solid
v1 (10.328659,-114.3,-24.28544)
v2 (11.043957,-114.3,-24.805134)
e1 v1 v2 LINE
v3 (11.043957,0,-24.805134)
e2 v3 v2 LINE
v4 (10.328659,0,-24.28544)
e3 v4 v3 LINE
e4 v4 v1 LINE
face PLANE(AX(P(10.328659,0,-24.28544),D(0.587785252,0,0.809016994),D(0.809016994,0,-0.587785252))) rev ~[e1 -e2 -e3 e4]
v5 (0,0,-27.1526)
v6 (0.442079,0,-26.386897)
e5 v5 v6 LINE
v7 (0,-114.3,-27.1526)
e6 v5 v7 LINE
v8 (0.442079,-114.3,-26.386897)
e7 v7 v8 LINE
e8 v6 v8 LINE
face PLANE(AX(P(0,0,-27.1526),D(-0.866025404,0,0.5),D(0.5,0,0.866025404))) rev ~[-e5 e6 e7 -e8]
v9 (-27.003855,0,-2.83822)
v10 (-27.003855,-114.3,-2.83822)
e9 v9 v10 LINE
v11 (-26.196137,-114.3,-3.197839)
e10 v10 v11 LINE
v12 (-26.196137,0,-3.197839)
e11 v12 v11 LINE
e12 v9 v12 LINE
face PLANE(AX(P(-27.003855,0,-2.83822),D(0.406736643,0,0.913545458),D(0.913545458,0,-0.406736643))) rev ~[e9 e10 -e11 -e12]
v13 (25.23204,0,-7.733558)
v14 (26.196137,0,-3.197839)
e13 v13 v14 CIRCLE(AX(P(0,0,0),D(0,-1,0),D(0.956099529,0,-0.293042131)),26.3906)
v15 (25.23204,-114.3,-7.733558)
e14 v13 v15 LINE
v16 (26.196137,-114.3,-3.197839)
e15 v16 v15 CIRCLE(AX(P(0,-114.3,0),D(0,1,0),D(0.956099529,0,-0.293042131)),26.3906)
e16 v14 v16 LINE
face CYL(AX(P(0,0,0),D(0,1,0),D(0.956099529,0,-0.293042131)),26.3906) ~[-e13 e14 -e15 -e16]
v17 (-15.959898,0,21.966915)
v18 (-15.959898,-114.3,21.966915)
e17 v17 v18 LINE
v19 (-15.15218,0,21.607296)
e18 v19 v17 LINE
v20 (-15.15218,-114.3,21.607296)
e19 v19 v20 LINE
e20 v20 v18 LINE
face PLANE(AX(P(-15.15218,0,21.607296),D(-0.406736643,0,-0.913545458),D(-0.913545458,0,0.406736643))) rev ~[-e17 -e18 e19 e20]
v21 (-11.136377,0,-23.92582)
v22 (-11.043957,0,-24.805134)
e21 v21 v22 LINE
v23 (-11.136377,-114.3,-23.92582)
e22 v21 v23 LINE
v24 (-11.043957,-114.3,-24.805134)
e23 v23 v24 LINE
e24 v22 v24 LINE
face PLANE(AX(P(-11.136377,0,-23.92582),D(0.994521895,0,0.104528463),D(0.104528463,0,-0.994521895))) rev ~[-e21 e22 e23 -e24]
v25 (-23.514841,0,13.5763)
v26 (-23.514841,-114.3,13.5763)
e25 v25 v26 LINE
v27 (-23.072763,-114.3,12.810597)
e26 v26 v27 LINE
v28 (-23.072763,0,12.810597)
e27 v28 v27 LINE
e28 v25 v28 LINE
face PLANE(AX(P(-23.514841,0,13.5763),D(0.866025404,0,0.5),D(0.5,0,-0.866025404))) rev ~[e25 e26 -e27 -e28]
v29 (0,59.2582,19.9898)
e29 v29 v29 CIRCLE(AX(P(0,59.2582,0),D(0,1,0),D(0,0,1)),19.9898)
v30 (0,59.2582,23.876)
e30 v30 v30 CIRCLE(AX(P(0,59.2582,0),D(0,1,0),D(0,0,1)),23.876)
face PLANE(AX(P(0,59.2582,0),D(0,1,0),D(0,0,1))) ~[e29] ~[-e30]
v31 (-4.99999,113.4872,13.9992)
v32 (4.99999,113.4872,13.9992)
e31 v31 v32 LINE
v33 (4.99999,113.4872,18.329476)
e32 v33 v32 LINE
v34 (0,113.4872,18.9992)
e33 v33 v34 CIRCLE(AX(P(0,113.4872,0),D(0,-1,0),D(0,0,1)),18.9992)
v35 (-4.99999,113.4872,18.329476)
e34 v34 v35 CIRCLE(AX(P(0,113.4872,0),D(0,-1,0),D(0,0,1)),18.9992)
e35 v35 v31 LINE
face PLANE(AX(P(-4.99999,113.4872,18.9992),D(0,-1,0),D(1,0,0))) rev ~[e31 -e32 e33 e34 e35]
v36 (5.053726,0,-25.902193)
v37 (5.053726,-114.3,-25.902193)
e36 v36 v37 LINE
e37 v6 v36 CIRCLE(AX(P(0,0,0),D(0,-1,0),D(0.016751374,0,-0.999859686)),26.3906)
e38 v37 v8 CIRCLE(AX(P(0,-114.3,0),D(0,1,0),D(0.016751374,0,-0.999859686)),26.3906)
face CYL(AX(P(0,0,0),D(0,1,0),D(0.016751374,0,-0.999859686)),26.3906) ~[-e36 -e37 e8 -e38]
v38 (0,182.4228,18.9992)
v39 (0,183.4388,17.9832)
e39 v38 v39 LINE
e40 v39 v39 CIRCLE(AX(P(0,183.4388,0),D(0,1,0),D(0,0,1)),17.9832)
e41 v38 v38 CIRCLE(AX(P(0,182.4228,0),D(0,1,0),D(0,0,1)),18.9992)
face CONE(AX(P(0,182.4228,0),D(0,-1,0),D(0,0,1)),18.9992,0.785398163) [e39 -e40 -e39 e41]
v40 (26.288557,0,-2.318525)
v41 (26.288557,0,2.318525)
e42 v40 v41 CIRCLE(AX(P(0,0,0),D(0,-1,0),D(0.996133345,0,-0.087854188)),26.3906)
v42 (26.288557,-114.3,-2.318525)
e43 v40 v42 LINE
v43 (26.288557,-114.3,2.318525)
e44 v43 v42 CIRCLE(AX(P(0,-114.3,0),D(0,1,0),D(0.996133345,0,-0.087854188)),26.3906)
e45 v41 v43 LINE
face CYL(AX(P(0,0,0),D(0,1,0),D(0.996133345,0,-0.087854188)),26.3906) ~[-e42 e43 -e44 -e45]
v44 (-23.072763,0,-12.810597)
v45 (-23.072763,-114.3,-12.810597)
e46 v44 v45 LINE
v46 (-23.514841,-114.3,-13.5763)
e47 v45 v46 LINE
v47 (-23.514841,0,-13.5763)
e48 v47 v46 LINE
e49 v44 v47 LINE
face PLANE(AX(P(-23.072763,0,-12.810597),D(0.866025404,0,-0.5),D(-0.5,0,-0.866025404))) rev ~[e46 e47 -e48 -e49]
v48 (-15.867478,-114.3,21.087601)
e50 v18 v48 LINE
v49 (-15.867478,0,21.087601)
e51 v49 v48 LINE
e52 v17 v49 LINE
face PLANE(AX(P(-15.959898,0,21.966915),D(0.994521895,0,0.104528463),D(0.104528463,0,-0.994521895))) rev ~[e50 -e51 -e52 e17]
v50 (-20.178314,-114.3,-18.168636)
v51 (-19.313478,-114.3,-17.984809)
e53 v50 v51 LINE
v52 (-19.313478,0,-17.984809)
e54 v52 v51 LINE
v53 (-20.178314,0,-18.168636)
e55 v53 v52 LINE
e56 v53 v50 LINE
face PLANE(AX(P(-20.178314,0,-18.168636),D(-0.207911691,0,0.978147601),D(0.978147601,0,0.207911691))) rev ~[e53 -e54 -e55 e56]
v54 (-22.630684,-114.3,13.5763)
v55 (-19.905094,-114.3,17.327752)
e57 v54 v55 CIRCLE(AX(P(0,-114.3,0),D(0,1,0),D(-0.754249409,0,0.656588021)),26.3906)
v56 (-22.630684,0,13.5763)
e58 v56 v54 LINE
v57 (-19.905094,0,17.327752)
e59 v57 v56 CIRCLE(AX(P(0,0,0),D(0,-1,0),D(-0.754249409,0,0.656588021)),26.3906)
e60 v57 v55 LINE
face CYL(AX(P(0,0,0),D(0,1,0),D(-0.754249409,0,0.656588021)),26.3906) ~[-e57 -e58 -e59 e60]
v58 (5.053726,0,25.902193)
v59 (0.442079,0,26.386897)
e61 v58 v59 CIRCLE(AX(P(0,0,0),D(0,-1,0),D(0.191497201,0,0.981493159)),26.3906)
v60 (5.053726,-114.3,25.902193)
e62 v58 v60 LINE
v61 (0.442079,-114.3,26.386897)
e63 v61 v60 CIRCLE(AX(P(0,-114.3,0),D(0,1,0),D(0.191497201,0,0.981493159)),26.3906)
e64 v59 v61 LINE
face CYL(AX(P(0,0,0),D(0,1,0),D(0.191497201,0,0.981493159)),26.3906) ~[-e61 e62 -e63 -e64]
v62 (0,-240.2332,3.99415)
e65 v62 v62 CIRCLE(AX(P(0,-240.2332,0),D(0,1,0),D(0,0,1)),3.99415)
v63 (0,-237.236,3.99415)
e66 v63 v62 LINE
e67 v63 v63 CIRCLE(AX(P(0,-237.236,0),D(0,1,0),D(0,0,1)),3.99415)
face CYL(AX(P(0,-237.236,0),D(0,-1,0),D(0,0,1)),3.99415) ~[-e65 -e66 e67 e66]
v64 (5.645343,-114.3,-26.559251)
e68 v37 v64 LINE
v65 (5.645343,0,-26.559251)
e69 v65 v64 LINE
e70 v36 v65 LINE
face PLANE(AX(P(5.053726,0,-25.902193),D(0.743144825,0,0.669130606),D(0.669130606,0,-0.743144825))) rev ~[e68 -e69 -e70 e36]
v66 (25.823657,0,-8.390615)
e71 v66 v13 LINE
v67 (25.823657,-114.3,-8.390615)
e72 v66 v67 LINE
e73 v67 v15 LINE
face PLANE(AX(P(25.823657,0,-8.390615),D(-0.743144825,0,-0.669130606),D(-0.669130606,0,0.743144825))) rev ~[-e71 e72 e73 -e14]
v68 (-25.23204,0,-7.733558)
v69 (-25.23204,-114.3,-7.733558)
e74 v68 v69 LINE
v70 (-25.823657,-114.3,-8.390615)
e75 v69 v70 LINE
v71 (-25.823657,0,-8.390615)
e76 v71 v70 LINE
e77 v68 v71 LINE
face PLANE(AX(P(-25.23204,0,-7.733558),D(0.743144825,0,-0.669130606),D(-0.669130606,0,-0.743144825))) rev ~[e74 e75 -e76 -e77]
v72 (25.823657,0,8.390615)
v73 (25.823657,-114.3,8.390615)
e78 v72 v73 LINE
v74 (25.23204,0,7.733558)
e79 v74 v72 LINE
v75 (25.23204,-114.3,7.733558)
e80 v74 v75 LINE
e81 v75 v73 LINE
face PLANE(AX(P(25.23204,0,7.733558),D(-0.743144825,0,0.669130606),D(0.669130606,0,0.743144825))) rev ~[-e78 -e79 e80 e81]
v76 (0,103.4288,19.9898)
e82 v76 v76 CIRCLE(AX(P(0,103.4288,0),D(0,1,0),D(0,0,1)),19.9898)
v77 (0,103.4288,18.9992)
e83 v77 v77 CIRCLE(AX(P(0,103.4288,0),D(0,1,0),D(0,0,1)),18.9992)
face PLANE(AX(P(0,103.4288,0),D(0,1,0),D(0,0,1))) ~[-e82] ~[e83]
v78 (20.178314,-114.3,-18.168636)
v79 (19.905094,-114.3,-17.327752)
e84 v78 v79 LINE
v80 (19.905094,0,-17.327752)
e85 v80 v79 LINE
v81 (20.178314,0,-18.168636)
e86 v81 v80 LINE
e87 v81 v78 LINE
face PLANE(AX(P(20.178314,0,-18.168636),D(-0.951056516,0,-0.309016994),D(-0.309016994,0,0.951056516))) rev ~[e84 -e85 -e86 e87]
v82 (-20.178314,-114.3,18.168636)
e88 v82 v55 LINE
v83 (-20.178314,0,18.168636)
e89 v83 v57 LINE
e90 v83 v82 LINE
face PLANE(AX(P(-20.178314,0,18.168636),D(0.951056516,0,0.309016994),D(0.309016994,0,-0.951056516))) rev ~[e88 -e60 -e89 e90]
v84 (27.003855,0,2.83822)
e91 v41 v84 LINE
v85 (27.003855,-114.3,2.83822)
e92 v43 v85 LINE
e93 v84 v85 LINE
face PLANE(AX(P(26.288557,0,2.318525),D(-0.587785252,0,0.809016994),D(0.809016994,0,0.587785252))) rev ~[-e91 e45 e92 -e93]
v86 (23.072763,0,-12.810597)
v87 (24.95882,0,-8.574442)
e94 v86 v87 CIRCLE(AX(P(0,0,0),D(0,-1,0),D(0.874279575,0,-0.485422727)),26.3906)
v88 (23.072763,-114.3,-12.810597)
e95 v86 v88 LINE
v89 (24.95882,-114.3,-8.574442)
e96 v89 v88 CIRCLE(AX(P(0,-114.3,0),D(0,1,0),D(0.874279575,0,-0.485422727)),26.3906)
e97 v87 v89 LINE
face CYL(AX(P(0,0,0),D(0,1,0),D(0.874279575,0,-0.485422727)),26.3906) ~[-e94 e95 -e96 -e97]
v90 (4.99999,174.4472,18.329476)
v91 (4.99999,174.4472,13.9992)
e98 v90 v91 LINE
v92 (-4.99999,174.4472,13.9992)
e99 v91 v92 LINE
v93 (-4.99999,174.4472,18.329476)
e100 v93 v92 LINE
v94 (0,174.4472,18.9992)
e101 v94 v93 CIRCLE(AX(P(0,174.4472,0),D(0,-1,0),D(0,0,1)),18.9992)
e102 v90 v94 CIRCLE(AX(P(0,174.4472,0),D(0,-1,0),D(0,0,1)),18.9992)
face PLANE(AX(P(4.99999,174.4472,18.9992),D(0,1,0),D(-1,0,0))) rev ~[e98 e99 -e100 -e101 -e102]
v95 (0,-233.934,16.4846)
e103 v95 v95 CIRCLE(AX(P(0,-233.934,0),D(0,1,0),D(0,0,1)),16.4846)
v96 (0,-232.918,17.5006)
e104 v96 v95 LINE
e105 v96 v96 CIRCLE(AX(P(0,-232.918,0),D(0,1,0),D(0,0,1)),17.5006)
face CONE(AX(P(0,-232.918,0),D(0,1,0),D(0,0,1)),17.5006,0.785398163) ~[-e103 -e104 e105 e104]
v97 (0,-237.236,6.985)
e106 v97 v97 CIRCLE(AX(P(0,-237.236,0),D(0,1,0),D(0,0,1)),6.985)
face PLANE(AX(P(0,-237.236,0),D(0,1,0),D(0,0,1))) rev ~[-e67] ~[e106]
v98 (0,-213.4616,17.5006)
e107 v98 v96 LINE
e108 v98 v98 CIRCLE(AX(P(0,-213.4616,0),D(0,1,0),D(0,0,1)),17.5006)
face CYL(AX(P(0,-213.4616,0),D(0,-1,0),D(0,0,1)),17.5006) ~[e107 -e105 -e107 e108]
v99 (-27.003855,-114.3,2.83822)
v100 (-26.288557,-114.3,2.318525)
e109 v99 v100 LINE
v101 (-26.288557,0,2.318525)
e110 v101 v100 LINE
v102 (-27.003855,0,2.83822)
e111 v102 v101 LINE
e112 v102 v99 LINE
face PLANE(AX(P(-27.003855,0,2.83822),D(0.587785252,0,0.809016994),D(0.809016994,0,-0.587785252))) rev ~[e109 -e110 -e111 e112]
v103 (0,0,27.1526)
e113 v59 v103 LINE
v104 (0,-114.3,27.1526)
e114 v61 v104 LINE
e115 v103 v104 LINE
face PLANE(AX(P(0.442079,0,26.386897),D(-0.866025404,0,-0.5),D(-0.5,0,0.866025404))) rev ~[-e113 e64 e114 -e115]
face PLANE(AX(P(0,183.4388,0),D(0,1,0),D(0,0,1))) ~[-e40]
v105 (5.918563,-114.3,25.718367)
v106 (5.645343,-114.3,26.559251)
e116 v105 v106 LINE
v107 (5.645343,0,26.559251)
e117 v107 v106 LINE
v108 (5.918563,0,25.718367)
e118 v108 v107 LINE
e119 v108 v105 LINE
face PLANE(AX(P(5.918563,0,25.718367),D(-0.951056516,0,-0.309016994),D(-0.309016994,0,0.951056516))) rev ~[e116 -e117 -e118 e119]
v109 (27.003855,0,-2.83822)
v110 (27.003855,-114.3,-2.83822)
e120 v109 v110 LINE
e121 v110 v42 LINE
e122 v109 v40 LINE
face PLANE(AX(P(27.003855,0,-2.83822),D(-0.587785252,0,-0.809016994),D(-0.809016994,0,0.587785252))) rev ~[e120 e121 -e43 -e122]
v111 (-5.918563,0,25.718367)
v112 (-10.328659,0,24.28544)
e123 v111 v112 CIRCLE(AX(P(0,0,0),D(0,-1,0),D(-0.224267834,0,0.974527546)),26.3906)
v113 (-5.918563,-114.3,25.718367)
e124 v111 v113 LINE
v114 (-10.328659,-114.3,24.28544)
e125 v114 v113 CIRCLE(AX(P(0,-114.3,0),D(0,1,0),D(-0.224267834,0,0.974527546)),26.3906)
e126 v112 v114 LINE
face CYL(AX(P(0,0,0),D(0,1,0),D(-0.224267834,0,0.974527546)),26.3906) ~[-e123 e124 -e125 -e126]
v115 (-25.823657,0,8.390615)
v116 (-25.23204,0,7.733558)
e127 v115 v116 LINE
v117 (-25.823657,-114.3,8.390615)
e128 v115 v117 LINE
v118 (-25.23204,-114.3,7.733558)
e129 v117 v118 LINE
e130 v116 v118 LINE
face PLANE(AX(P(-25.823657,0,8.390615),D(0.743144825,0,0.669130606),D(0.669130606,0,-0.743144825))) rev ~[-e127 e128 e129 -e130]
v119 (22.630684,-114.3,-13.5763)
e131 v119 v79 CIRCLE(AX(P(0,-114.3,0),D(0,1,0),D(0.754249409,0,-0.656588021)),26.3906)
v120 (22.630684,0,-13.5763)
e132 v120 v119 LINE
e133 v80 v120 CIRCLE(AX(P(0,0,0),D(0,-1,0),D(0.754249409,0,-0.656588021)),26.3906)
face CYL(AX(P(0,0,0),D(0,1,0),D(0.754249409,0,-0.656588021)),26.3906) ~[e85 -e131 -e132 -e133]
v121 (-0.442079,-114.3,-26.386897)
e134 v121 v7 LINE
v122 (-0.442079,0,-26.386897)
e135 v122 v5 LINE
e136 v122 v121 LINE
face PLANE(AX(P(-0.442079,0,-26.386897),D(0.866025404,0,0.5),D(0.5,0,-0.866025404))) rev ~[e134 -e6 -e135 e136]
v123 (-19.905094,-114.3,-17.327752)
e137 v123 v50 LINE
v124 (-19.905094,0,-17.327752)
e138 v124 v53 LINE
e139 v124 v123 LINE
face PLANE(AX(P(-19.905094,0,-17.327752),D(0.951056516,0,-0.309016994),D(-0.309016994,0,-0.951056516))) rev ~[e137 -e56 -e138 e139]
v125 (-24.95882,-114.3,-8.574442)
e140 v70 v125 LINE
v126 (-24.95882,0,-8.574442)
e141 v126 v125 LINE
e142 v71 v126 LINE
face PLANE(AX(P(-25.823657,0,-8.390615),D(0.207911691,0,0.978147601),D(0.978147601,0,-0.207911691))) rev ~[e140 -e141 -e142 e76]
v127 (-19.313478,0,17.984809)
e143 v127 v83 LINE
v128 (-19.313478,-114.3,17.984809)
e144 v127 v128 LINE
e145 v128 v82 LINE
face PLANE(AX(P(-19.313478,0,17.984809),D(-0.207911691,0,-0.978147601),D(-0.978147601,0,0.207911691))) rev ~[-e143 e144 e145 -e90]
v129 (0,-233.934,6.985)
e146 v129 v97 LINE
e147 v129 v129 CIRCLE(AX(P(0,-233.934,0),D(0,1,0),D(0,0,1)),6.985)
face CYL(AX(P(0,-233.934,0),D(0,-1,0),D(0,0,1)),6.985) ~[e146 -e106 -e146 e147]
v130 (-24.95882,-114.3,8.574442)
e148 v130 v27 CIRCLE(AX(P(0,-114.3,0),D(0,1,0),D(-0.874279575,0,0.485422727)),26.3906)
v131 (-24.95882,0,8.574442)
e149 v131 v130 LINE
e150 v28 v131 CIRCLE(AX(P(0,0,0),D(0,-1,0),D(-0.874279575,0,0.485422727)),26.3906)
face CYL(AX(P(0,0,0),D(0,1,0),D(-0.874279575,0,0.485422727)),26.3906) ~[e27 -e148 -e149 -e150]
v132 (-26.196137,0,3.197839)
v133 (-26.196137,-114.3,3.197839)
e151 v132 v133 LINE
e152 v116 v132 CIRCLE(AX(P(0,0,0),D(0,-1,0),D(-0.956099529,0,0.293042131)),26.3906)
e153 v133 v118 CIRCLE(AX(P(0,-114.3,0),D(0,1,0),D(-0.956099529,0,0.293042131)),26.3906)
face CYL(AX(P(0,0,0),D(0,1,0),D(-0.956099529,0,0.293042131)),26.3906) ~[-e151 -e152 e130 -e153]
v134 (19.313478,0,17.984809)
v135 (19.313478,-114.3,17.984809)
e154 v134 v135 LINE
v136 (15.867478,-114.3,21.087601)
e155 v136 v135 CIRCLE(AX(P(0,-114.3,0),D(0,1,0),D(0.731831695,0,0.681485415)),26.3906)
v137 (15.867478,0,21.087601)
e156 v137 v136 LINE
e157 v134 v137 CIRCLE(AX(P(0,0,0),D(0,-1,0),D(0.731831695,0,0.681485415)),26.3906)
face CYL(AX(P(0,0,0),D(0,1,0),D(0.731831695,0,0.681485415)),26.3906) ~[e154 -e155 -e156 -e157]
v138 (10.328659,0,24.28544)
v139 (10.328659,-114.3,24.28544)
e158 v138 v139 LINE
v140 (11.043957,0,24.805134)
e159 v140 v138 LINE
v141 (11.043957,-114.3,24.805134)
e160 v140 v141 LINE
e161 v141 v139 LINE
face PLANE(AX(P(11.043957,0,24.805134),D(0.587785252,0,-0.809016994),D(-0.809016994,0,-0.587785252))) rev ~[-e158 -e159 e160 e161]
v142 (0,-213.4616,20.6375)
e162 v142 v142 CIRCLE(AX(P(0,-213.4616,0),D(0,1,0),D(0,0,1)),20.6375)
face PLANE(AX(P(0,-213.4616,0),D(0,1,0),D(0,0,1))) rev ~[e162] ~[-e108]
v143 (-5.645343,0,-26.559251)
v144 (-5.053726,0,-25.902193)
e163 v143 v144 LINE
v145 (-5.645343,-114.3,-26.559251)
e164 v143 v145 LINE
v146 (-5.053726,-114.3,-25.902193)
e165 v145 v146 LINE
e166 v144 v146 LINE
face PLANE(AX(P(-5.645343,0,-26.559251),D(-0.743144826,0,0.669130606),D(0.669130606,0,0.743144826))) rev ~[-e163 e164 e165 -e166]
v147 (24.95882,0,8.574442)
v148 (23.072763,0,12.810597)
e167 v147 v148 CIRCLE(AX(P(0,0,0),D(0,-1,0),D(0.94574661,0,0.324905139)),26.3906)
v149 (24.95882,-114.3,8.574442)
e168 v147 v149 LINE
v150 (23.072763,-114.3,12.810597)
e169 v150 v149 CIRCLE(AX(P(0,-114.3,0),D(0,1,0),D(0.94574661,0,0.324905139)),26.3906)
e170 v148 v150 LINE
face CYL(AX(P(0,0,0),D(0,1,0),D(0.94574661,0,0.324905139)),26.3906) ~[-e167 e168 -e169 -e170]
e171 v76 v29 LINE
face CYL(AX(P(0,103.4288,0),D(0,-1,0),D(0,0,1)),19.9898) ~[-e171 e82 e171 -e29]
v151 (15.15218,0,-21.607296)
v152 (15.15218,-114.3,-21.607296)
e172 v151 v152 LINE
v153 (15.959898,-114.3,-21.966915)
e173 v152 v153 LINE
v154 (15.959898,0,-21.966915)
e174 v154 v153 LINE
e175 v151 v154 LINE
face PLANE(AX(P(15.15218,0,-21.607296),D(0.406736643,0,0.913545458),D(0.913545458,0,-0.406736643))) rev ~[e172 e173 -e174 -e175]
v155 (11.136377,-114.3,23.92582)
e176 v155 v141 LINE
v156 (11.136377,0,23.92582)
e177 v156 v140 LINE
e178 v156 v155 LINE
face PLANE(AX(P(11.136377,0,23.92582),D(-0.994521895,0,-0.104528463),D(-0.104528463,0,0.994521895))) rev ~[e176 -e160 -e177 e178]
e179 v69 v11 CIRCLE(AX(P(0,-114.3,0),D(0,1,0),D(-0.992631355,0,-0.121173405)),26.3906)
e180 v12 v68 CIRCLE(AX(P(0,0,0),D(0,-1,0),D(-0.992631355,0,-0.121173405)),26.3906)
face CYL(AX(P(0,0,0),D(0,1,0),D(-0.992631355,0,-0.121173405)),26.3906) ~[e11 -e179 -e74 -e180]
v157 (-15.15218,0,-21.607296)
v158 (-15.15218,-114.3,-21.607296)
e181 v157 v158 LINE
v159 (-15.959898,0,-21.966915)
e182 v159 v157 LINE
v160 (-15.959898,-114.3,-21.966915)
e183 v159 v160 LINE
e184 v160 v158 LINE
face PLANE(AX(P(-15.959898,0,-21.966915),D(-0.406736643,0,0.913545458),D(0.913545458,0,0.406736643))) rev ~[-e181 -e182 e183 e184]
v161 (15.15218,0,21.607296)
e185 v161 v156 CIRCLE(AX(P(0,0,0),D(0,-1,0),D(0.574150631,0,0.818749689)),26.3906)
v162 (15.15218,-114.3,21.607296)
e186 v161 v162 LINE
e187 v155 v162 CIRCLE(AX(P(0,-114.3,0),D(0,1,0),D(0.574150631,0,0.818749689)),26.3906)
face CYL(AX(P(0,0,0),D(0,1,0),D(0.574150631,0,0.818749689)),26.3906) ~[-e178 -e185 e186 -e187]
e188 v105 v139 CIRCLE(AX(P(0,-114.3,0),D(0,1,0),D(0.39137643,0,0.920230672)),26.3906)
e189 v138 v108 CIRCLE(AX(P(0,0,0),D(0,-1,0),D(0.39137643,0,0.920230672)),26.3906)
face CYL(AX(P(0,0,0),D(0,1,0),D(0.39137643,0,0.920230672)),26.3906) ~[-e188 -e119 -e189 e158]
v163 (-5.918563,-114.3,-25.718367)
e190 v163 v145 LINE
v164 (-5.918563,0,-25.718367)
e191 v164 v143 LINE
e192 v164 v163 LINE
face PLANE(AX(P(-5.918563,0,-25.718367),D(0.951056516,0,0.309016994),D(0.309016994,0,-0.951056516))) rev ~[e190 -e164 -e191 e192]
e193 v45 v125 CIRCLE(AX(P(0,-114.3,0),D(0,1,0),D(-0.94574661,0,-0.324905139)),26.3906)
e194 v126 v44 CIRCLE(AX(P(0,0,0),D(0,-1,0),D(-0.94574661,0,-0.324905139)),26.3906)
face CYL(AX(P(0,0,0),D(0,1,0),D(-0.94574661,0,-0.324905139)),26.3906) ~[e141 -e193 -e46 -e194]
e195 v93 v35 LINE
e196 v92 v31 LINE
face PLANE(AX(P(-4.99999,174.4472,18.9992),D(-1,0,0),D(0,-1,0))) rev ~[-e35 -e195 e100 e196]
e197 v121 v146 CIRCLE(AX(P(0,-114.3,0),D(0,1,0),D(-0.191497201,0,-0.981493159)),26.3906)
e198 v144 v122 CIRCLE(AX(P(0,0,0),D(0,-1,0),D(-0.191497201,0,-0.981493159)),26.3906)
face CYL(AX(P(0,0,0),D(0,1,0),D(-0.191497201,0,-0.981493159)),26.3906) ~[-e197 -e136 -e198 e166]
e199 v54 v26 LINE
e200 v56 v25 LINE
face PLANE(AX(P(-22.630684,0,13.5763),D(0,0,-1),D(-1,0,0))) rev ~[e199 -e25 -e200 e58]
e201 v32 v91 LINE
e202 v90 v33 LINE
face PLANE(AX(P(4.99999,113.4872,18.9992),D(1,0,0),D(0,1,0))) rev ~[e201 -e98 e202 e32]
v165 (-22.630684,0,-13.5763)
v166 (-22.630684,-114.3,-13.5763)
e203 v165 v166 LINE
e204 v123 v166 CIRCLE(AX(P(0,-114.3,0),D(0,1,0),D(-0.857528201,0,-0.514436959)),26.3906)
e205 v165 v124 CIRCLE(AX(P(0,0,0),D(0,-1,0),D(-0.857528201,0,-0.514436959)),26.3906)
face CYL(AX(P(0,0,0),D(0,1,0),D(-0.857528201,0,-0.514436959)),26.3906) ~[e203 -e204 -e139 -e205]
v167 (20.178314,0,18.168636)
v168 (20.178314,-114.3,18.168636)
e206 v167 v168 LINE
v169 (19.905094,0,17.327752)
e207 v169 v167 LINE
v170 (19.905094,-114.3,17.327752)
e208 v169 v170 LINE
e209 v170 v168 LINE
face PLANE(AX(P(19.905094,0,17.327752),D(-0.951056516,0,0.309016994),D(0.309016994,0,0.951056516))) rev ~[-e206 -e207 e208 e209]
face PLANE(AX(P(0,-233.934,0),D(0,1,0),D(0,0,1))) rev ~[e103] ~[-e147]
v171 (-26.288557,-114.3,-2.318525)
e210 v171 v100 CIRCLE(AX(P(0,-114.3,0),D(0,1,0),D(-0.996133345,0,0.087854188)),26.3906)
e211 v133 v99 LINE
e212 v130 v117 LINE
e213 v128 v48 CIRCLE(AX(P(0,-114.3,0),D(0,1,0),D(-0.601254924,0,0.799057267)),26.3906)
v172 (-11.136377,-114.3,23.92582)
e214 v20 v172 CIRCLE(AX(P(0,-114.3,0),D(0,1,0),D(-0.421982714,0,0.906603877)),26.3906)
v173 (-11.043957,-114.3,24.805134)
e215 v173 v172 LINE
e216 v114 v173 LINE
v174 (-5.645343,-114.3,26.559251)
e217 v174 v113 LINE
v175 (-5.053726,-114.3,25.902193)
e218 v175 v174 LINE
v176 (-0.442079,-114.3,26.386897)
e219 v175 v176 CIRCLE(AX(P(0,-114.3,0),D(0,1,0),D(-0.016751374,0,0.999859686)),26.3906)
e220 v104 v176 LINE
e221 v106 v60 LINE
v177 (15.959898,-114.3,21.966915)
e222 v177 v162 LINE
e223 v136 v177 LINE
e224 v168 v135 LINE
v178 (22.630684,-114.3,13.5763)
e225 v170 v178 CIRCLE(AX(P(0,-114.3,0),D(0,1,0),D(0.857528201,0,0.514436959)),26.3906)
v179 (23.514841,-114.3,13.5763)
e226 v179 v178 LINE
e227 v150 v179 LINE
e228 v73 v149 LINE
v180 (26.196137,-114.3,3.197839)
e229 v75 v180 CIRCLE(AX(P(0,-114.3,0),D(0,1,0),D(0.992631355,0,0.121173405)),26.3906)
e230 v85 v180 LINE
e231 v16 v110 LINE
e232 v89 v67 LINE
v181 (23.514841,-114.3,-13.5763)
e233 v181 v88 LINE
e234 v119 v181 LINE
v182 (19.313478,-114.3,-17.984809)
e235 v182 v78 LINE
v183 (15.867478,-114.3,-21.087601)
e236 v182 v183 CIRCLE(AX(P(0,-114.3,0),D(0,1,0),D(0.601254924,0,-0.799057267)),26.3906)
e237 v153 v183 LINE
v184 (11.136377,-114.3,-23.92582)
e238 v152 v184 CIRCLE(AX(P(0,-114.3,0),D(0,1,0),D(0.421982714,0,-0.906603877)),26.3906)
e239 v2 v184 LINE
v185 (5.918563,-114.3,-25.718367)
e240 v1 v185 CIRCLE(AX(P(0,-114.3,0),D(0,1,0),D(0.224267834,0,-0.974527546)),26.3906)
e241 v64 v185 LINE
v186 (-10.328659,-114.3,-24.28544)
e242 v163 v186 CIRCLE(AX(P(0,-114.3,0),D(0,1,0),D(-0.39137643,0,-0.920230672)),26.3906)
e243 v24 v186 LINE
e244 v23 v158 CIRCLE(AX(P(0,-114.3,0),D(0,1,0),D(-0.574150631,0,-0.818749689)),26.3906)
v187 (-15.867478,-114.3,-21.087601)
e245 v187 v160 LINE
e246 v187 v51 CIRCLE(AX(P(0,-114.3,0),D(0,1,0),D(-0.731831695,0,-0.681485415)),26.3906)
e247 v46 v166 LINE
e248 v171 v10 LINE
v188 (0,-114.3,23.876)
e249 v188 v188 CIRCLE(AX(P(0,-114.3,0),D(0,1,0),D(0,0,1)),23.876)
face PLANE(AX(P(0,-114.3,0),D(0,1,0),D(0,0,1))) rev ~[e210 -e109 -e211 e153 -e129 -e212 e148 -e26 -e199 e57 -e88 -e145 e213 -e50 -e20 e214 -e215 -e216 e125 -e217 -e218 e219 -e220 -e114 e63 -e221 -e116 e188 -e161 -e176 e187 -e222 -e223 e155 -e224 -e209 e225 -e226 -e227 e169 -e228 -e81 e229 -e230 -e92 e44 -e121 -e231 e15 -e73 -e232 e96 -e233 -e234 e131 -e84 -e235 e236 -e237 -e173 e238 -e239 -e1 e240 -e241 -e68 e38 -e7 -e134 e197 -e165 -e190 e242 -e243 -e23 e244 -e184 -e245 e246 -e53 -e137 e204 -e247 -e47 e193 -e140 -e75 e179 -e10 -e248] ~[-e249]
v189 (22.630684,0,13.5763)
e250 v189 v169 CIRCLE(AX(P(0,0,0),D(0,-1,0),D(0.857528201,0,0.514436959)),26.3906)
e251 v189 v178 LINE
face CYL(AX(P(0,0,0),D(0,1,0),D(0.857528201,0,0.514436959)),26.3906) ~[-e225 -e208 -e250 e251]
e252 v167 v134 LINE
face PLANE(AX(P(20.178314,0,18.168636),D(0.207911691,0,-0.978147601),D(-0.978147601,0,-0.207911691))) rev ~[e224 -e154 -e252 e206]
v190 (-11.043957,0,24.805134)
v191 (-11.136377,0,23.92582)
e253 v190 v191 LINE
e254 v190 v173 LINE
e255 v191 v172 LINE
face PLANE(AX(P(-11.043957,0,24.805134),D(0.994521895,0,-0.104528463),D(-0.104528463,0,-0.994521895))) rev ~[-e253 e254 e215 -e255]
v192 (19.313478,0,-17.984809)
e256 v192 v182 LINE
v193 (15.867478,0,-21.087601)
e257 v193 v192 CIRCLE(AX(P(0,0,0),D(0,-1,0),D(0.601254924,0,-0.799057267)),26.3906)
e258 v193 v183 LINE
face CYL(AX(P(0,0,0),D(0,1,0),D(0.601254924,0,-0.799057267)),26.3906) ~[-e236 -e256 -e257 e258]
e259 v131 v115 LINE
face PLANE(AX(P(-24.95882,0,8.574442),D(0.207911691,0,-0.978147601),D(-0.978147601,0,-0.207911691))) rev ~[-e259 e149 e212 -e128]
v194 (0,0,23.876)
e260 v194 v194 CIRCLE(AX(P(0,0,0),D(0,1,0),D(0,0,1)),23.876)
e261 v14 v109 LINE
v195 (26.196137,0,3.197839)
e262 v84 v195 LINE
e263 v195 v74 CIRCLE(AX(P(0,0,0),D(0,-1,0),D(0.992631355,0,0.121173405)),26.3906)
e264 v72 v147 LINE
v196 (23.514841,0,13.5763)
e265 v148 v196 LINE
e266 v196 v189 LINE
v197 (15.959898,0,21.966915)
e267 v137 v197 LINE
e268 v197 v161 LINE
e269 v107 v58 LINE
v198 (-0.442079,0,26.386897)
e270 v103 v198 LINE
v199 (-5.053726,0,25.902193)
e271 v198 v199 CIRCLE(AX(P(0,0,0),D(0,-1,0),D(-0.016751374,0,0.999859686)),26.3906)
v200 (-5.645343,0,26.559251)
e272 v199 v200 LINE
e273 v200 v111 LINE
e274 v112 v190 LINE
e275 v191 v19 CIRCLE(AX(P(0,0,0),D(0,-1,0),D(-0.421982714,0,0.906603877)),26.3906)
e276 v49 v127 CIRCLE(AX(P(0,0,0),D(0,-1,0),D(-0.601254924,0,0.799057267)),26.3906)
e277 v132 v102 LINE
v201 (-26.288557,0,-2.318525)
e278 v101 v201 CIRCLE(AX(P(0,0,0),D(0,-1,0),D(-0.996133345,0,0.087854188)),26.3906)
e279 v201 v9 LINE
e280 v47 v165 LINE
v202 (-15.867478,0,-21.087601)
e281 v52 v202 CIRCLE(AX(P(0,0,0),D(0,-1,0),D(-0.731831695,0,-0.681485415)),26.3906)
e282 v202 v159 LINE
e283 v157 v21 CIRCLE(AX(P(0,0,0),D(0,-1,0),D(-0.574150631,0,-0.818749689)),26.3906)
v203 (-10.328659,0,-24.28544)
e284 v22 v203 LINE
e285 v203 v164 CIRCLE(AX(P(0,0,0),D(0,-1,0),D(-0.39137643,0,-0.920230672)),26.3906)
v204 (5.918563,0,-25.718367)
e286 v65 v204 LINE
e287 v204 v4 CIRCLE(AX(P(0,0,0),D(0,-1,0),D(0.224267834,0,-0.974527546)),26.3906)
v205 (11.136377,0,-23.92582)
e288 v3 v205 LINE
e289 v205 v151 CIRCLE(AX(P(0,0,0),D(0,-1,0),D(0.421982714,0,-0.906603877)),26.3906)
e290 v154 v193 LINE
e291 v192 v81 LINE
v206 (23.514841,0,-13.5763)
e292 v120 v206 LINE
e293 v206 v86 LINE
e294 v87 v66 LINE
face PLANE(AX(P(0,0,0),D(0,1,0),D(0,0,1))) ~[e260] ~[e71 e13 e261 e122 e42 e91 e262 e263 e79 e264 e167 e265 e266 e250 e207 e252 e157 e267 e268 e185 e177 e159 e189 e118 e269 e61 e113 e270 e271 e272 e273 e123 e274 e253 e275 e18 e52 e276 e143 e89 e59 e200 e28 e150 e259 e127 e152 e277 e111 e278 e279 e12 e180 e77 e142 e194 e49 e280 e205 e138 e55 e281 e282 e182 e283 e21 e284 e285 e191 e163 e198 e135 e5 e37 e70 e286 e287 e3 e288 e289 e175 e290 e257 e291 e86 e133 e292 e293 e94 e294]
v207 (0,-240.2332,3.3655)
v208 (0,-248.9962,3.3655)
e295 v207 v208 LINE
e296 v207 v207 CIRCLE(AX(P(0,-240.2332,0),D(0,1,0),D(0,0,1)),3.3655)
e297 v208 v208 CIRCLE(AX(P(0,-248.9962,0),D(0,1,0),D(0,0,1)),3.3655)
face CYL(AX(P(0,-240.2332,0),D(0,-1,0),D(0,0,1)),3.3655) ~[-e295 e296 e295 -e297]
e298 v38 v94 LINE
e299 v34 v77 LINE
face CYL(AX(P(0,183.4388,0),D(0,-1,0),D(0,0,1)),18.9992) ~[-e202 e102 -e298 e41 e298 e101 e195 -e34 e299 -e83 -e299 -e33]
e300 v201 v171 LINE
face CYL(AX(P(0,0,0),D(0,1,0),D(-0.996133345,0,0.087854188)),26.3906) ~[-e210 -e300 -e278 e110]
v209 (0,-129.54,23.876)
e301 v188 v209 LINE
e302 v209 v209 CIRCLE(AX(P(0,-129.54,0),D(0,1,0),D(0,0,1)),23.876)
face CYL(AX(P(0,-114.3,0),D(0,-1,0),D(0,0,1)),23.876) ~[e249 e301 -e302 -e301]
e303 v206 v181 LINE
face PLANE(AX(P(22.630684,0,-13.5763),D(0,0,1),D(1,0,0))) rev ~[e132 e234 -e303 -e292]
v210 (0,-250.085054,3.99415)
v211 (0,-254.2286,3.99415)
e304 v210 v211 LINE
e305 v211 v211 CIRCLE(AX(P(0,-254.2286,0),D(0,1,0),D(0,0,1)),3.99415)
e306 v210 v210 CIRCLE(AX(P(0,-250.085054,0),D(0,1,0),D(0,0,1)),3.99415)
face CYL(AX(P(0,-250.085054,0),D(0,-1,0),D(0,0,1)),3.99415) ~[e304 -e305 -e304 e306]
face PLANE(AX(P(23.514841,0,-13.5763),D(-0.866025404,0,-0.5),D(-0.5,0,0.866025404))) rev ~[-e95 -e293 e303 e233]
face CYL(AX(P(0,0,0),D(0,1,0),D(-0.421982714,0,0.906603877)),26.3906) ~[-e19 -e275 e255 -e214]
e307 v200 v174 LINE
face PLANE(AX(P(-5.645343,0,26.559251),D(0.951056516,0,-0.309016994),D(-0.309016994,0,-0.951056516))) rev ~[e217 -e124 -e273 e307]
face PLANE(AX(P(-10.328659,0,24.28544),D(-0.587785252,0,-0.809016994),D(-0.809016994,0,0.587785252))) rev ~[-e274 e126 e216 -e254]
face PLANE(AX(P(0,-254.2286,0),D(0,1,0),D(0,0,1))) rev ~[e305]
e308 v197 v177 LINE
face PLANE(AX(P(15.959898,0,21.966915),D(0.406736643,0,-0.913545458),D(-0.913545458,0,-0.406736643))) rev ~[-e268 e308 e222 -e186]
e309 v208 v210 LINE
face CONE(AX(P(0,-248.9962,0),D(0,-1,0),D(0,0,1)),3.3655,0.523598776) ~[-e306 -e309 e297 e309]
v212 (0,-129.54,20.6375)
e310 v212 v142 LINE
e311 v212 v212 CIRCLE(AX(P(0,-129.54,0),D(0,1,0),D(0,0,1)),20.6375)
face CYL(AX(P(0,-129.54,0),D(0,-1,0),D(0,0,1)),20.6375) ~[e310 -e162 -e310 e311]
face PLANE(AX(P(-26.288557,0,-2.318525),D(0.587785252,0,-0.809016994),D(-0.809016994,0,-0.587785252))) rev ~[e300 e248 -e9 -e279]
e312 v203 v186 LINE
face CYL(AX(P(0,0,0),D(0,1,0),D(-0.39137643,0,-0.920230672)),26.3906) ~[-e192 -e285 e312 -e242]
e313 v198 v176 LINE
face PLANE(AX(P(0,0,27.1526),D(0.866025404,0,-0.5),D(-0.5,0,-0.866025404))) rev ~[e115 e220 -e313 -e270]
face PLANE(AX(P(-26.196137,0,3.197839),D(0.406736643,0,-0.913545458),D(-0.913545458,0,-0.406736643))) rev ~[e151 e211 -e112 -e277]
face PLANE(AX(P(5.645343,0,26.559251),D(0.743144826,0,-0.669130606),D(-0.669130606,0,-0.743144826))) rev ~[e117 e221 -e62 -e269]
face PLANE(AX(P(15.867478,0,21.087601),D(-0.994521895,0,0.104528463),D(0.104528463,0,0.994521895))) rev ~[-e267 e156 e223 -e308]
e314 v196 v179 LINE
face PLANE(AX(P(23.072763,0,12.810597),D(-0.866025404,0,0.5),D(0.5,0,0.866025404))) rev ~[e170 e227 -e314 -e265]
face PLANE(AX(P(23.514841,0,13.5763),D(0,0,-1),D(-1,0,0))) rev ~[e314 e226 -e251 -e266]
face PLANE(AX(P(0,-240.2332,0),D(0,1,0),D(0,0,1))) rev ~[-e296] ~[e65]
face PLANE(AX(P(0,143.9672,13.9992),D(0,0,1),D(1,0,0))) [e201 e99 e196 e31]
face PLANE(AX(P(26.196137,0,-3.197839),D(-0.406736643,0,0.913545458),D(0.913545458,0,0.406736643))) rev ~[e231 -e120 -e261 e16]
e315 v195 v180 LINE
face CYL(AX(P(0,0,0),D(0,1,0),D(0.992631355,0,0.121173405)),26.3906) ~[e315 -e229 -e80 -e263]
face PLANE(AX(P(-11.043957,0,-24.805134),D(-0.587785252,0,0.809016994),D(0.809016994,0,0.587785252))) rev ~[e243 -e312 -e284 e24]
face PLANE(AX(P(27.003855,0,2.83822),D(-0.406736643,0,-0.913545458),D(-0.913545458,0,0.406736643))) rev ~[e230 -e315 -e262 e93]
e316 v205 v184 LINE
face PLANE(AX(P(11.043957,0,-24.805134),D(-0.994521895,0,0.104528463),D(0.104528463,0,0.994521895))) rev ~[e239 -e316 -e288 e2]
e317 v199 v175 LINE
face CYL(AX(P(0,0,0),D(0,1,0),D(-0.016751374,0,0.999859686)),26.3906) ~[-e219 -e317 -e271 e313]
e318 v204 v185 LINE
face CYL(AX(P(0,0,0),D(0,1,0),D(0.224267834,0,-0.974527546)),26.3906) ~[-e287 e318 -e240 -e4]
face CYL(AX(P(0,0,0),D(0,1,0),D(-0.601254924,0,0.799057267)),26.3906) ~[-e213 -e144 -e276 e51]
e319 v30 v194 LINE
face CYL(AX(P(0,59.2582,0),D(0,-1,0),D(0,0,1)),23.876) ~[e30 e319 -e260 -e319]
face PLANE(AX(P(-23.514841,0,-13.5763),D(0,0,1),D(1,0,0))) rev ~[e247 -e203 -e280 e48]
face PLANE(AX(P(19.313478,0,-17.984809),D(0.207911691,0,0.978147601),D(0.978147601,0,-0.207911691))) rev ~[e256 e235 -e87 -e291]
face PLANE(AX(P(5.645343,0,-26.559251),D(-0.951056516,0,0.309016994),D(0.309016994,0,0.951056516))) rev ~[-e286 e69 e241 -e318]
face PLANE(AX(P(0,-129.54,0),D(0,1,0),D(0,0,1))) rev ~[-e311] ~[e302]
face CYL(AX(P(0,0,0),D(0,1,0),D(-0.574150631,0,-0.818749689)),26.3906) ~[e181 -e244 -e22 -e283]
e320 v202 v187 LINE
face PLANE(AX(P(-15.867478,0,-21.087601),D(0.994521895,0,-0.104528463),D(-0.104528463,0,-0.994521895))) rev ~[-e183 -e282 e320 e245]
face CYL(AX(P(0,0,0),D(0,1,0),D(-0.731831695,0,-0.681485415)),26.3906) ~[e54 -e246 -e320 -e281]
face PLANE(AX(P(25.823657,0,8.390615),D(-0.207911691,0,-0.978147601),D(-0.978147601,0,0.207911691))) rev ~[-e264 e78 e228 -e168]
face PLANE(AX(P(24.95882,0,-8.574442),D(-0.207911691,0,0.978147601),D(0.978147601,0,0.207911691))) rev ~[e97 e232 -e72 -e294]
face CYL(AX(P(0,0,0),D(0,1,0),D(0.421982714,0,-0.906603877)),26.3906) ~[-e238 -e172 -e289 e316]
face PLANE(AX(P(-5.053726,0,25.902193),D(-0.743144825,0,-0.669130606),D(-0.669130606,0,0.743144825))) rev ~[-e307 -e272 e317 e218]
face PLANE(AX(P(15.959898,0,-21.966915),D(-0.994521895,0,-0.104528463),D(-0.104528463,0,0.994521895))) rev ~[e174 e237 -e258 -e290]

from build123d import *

# Parameters (mm, degrees)
F3_DEPTH        = 254.2296
F3_COPIES_COUNT = 30
F6_DEPTH        = 5
F7_SIZE         = 1.016


# Not quite as in the source:
# - a pattern or mirror of a feature is missing from the dataset's text; its kind, count and spacing are read off the source's solid


with BuildPart() as f1:
    # F0 (on Right) → F1 (revolve)
    with BuildSketch(Plane.YZ):
        Polygon((59.2582, 23.876), (0, 23.876), (0, 27.1526), (-114.3, 27.1526), (-114.3, 23.876), (-129.54, 23.876), (-129.54, 20.6375), (-213.4616, 20.6375), (-213.4616, 17.5006), (-233.934, 17.5006), (-233.934, 6.985), (-237.236, 6.985), (-237.236, 3.99415), (-240.2332, 3.99415), (-240.2332, 3.3655), (-248.9962, 3.3655), (-250.0850537402, 3.99415), (-254.2286, 3.99415), (-254.2286, 0), (-233.934, 0), (183.4388, 0), (183.4388, 18.9992), (103.4288, 18.9992), (103.4288, 19.9898), (59.2582, 19.9898), align=None)
    revolve(axis=Axis((0, -25.2476, 0), (0, 1, 0)))

    # F2 (on face) → F3 (cut, through all)
    with BuildSketch(Plane(origin=(0, 0, 0), x_dir=(-1, 0, 0), z_dir=(0, 1, 0))):
        with BuildLine():
            Line((-0.442078818, 26.3868970263), (0, 27.1526))
            ThreePointArc((0, 27.1526), (-2.8382195517, 27.0038552162), (-5.6453429761, 26.5592505437))
            Line((-5.6453429761, 26.5592505437), (-5.0537260411, 25.9021933716))
            ThreePointArc((-5.0537260411, 25.9021933716), (-2.7585688627, 26.2460295319), (-0.442078818, 26.3868970263))
        make_face()
    f3 = extrude(amount=-F3_DEPTH, mode=Mode.SUBTRACT)

    # F3_copies: F3 ×30 about axis
    f3_copies_axis = Axis((0, 0, 0), (0, 1, 0))
    for i in range(1, F3_COPIES_COUNT):
        add(f3.rotate(f3_copies_axis, i * 360 / F3_COPIES_COUNT), mode=Mode.SUBTRACT)

    # F5 (on offset) → F6 (cut)
    with BuildSketch(Plane.XY.offset(18.9992)):
        Polygon((-4.99999, 174.4472), (-4.99999, 113.4872), (4.99999, 113.4872), (4.99999, 174.4472), (0, 174.4472), align=None)
    extrude(amount=-F6_DEPTH, mode=Mode.SUBTRACT)

    # F7
    f7_edges = [f1.edges().sort_by_distance(p)[0] for p in [
        (0, 183.4388, -18.9992),
        (0, -233.934, -17.5006),
    ]]
    chamfer(f7_edges, length=F7_SIZE)


solid = f1.part
